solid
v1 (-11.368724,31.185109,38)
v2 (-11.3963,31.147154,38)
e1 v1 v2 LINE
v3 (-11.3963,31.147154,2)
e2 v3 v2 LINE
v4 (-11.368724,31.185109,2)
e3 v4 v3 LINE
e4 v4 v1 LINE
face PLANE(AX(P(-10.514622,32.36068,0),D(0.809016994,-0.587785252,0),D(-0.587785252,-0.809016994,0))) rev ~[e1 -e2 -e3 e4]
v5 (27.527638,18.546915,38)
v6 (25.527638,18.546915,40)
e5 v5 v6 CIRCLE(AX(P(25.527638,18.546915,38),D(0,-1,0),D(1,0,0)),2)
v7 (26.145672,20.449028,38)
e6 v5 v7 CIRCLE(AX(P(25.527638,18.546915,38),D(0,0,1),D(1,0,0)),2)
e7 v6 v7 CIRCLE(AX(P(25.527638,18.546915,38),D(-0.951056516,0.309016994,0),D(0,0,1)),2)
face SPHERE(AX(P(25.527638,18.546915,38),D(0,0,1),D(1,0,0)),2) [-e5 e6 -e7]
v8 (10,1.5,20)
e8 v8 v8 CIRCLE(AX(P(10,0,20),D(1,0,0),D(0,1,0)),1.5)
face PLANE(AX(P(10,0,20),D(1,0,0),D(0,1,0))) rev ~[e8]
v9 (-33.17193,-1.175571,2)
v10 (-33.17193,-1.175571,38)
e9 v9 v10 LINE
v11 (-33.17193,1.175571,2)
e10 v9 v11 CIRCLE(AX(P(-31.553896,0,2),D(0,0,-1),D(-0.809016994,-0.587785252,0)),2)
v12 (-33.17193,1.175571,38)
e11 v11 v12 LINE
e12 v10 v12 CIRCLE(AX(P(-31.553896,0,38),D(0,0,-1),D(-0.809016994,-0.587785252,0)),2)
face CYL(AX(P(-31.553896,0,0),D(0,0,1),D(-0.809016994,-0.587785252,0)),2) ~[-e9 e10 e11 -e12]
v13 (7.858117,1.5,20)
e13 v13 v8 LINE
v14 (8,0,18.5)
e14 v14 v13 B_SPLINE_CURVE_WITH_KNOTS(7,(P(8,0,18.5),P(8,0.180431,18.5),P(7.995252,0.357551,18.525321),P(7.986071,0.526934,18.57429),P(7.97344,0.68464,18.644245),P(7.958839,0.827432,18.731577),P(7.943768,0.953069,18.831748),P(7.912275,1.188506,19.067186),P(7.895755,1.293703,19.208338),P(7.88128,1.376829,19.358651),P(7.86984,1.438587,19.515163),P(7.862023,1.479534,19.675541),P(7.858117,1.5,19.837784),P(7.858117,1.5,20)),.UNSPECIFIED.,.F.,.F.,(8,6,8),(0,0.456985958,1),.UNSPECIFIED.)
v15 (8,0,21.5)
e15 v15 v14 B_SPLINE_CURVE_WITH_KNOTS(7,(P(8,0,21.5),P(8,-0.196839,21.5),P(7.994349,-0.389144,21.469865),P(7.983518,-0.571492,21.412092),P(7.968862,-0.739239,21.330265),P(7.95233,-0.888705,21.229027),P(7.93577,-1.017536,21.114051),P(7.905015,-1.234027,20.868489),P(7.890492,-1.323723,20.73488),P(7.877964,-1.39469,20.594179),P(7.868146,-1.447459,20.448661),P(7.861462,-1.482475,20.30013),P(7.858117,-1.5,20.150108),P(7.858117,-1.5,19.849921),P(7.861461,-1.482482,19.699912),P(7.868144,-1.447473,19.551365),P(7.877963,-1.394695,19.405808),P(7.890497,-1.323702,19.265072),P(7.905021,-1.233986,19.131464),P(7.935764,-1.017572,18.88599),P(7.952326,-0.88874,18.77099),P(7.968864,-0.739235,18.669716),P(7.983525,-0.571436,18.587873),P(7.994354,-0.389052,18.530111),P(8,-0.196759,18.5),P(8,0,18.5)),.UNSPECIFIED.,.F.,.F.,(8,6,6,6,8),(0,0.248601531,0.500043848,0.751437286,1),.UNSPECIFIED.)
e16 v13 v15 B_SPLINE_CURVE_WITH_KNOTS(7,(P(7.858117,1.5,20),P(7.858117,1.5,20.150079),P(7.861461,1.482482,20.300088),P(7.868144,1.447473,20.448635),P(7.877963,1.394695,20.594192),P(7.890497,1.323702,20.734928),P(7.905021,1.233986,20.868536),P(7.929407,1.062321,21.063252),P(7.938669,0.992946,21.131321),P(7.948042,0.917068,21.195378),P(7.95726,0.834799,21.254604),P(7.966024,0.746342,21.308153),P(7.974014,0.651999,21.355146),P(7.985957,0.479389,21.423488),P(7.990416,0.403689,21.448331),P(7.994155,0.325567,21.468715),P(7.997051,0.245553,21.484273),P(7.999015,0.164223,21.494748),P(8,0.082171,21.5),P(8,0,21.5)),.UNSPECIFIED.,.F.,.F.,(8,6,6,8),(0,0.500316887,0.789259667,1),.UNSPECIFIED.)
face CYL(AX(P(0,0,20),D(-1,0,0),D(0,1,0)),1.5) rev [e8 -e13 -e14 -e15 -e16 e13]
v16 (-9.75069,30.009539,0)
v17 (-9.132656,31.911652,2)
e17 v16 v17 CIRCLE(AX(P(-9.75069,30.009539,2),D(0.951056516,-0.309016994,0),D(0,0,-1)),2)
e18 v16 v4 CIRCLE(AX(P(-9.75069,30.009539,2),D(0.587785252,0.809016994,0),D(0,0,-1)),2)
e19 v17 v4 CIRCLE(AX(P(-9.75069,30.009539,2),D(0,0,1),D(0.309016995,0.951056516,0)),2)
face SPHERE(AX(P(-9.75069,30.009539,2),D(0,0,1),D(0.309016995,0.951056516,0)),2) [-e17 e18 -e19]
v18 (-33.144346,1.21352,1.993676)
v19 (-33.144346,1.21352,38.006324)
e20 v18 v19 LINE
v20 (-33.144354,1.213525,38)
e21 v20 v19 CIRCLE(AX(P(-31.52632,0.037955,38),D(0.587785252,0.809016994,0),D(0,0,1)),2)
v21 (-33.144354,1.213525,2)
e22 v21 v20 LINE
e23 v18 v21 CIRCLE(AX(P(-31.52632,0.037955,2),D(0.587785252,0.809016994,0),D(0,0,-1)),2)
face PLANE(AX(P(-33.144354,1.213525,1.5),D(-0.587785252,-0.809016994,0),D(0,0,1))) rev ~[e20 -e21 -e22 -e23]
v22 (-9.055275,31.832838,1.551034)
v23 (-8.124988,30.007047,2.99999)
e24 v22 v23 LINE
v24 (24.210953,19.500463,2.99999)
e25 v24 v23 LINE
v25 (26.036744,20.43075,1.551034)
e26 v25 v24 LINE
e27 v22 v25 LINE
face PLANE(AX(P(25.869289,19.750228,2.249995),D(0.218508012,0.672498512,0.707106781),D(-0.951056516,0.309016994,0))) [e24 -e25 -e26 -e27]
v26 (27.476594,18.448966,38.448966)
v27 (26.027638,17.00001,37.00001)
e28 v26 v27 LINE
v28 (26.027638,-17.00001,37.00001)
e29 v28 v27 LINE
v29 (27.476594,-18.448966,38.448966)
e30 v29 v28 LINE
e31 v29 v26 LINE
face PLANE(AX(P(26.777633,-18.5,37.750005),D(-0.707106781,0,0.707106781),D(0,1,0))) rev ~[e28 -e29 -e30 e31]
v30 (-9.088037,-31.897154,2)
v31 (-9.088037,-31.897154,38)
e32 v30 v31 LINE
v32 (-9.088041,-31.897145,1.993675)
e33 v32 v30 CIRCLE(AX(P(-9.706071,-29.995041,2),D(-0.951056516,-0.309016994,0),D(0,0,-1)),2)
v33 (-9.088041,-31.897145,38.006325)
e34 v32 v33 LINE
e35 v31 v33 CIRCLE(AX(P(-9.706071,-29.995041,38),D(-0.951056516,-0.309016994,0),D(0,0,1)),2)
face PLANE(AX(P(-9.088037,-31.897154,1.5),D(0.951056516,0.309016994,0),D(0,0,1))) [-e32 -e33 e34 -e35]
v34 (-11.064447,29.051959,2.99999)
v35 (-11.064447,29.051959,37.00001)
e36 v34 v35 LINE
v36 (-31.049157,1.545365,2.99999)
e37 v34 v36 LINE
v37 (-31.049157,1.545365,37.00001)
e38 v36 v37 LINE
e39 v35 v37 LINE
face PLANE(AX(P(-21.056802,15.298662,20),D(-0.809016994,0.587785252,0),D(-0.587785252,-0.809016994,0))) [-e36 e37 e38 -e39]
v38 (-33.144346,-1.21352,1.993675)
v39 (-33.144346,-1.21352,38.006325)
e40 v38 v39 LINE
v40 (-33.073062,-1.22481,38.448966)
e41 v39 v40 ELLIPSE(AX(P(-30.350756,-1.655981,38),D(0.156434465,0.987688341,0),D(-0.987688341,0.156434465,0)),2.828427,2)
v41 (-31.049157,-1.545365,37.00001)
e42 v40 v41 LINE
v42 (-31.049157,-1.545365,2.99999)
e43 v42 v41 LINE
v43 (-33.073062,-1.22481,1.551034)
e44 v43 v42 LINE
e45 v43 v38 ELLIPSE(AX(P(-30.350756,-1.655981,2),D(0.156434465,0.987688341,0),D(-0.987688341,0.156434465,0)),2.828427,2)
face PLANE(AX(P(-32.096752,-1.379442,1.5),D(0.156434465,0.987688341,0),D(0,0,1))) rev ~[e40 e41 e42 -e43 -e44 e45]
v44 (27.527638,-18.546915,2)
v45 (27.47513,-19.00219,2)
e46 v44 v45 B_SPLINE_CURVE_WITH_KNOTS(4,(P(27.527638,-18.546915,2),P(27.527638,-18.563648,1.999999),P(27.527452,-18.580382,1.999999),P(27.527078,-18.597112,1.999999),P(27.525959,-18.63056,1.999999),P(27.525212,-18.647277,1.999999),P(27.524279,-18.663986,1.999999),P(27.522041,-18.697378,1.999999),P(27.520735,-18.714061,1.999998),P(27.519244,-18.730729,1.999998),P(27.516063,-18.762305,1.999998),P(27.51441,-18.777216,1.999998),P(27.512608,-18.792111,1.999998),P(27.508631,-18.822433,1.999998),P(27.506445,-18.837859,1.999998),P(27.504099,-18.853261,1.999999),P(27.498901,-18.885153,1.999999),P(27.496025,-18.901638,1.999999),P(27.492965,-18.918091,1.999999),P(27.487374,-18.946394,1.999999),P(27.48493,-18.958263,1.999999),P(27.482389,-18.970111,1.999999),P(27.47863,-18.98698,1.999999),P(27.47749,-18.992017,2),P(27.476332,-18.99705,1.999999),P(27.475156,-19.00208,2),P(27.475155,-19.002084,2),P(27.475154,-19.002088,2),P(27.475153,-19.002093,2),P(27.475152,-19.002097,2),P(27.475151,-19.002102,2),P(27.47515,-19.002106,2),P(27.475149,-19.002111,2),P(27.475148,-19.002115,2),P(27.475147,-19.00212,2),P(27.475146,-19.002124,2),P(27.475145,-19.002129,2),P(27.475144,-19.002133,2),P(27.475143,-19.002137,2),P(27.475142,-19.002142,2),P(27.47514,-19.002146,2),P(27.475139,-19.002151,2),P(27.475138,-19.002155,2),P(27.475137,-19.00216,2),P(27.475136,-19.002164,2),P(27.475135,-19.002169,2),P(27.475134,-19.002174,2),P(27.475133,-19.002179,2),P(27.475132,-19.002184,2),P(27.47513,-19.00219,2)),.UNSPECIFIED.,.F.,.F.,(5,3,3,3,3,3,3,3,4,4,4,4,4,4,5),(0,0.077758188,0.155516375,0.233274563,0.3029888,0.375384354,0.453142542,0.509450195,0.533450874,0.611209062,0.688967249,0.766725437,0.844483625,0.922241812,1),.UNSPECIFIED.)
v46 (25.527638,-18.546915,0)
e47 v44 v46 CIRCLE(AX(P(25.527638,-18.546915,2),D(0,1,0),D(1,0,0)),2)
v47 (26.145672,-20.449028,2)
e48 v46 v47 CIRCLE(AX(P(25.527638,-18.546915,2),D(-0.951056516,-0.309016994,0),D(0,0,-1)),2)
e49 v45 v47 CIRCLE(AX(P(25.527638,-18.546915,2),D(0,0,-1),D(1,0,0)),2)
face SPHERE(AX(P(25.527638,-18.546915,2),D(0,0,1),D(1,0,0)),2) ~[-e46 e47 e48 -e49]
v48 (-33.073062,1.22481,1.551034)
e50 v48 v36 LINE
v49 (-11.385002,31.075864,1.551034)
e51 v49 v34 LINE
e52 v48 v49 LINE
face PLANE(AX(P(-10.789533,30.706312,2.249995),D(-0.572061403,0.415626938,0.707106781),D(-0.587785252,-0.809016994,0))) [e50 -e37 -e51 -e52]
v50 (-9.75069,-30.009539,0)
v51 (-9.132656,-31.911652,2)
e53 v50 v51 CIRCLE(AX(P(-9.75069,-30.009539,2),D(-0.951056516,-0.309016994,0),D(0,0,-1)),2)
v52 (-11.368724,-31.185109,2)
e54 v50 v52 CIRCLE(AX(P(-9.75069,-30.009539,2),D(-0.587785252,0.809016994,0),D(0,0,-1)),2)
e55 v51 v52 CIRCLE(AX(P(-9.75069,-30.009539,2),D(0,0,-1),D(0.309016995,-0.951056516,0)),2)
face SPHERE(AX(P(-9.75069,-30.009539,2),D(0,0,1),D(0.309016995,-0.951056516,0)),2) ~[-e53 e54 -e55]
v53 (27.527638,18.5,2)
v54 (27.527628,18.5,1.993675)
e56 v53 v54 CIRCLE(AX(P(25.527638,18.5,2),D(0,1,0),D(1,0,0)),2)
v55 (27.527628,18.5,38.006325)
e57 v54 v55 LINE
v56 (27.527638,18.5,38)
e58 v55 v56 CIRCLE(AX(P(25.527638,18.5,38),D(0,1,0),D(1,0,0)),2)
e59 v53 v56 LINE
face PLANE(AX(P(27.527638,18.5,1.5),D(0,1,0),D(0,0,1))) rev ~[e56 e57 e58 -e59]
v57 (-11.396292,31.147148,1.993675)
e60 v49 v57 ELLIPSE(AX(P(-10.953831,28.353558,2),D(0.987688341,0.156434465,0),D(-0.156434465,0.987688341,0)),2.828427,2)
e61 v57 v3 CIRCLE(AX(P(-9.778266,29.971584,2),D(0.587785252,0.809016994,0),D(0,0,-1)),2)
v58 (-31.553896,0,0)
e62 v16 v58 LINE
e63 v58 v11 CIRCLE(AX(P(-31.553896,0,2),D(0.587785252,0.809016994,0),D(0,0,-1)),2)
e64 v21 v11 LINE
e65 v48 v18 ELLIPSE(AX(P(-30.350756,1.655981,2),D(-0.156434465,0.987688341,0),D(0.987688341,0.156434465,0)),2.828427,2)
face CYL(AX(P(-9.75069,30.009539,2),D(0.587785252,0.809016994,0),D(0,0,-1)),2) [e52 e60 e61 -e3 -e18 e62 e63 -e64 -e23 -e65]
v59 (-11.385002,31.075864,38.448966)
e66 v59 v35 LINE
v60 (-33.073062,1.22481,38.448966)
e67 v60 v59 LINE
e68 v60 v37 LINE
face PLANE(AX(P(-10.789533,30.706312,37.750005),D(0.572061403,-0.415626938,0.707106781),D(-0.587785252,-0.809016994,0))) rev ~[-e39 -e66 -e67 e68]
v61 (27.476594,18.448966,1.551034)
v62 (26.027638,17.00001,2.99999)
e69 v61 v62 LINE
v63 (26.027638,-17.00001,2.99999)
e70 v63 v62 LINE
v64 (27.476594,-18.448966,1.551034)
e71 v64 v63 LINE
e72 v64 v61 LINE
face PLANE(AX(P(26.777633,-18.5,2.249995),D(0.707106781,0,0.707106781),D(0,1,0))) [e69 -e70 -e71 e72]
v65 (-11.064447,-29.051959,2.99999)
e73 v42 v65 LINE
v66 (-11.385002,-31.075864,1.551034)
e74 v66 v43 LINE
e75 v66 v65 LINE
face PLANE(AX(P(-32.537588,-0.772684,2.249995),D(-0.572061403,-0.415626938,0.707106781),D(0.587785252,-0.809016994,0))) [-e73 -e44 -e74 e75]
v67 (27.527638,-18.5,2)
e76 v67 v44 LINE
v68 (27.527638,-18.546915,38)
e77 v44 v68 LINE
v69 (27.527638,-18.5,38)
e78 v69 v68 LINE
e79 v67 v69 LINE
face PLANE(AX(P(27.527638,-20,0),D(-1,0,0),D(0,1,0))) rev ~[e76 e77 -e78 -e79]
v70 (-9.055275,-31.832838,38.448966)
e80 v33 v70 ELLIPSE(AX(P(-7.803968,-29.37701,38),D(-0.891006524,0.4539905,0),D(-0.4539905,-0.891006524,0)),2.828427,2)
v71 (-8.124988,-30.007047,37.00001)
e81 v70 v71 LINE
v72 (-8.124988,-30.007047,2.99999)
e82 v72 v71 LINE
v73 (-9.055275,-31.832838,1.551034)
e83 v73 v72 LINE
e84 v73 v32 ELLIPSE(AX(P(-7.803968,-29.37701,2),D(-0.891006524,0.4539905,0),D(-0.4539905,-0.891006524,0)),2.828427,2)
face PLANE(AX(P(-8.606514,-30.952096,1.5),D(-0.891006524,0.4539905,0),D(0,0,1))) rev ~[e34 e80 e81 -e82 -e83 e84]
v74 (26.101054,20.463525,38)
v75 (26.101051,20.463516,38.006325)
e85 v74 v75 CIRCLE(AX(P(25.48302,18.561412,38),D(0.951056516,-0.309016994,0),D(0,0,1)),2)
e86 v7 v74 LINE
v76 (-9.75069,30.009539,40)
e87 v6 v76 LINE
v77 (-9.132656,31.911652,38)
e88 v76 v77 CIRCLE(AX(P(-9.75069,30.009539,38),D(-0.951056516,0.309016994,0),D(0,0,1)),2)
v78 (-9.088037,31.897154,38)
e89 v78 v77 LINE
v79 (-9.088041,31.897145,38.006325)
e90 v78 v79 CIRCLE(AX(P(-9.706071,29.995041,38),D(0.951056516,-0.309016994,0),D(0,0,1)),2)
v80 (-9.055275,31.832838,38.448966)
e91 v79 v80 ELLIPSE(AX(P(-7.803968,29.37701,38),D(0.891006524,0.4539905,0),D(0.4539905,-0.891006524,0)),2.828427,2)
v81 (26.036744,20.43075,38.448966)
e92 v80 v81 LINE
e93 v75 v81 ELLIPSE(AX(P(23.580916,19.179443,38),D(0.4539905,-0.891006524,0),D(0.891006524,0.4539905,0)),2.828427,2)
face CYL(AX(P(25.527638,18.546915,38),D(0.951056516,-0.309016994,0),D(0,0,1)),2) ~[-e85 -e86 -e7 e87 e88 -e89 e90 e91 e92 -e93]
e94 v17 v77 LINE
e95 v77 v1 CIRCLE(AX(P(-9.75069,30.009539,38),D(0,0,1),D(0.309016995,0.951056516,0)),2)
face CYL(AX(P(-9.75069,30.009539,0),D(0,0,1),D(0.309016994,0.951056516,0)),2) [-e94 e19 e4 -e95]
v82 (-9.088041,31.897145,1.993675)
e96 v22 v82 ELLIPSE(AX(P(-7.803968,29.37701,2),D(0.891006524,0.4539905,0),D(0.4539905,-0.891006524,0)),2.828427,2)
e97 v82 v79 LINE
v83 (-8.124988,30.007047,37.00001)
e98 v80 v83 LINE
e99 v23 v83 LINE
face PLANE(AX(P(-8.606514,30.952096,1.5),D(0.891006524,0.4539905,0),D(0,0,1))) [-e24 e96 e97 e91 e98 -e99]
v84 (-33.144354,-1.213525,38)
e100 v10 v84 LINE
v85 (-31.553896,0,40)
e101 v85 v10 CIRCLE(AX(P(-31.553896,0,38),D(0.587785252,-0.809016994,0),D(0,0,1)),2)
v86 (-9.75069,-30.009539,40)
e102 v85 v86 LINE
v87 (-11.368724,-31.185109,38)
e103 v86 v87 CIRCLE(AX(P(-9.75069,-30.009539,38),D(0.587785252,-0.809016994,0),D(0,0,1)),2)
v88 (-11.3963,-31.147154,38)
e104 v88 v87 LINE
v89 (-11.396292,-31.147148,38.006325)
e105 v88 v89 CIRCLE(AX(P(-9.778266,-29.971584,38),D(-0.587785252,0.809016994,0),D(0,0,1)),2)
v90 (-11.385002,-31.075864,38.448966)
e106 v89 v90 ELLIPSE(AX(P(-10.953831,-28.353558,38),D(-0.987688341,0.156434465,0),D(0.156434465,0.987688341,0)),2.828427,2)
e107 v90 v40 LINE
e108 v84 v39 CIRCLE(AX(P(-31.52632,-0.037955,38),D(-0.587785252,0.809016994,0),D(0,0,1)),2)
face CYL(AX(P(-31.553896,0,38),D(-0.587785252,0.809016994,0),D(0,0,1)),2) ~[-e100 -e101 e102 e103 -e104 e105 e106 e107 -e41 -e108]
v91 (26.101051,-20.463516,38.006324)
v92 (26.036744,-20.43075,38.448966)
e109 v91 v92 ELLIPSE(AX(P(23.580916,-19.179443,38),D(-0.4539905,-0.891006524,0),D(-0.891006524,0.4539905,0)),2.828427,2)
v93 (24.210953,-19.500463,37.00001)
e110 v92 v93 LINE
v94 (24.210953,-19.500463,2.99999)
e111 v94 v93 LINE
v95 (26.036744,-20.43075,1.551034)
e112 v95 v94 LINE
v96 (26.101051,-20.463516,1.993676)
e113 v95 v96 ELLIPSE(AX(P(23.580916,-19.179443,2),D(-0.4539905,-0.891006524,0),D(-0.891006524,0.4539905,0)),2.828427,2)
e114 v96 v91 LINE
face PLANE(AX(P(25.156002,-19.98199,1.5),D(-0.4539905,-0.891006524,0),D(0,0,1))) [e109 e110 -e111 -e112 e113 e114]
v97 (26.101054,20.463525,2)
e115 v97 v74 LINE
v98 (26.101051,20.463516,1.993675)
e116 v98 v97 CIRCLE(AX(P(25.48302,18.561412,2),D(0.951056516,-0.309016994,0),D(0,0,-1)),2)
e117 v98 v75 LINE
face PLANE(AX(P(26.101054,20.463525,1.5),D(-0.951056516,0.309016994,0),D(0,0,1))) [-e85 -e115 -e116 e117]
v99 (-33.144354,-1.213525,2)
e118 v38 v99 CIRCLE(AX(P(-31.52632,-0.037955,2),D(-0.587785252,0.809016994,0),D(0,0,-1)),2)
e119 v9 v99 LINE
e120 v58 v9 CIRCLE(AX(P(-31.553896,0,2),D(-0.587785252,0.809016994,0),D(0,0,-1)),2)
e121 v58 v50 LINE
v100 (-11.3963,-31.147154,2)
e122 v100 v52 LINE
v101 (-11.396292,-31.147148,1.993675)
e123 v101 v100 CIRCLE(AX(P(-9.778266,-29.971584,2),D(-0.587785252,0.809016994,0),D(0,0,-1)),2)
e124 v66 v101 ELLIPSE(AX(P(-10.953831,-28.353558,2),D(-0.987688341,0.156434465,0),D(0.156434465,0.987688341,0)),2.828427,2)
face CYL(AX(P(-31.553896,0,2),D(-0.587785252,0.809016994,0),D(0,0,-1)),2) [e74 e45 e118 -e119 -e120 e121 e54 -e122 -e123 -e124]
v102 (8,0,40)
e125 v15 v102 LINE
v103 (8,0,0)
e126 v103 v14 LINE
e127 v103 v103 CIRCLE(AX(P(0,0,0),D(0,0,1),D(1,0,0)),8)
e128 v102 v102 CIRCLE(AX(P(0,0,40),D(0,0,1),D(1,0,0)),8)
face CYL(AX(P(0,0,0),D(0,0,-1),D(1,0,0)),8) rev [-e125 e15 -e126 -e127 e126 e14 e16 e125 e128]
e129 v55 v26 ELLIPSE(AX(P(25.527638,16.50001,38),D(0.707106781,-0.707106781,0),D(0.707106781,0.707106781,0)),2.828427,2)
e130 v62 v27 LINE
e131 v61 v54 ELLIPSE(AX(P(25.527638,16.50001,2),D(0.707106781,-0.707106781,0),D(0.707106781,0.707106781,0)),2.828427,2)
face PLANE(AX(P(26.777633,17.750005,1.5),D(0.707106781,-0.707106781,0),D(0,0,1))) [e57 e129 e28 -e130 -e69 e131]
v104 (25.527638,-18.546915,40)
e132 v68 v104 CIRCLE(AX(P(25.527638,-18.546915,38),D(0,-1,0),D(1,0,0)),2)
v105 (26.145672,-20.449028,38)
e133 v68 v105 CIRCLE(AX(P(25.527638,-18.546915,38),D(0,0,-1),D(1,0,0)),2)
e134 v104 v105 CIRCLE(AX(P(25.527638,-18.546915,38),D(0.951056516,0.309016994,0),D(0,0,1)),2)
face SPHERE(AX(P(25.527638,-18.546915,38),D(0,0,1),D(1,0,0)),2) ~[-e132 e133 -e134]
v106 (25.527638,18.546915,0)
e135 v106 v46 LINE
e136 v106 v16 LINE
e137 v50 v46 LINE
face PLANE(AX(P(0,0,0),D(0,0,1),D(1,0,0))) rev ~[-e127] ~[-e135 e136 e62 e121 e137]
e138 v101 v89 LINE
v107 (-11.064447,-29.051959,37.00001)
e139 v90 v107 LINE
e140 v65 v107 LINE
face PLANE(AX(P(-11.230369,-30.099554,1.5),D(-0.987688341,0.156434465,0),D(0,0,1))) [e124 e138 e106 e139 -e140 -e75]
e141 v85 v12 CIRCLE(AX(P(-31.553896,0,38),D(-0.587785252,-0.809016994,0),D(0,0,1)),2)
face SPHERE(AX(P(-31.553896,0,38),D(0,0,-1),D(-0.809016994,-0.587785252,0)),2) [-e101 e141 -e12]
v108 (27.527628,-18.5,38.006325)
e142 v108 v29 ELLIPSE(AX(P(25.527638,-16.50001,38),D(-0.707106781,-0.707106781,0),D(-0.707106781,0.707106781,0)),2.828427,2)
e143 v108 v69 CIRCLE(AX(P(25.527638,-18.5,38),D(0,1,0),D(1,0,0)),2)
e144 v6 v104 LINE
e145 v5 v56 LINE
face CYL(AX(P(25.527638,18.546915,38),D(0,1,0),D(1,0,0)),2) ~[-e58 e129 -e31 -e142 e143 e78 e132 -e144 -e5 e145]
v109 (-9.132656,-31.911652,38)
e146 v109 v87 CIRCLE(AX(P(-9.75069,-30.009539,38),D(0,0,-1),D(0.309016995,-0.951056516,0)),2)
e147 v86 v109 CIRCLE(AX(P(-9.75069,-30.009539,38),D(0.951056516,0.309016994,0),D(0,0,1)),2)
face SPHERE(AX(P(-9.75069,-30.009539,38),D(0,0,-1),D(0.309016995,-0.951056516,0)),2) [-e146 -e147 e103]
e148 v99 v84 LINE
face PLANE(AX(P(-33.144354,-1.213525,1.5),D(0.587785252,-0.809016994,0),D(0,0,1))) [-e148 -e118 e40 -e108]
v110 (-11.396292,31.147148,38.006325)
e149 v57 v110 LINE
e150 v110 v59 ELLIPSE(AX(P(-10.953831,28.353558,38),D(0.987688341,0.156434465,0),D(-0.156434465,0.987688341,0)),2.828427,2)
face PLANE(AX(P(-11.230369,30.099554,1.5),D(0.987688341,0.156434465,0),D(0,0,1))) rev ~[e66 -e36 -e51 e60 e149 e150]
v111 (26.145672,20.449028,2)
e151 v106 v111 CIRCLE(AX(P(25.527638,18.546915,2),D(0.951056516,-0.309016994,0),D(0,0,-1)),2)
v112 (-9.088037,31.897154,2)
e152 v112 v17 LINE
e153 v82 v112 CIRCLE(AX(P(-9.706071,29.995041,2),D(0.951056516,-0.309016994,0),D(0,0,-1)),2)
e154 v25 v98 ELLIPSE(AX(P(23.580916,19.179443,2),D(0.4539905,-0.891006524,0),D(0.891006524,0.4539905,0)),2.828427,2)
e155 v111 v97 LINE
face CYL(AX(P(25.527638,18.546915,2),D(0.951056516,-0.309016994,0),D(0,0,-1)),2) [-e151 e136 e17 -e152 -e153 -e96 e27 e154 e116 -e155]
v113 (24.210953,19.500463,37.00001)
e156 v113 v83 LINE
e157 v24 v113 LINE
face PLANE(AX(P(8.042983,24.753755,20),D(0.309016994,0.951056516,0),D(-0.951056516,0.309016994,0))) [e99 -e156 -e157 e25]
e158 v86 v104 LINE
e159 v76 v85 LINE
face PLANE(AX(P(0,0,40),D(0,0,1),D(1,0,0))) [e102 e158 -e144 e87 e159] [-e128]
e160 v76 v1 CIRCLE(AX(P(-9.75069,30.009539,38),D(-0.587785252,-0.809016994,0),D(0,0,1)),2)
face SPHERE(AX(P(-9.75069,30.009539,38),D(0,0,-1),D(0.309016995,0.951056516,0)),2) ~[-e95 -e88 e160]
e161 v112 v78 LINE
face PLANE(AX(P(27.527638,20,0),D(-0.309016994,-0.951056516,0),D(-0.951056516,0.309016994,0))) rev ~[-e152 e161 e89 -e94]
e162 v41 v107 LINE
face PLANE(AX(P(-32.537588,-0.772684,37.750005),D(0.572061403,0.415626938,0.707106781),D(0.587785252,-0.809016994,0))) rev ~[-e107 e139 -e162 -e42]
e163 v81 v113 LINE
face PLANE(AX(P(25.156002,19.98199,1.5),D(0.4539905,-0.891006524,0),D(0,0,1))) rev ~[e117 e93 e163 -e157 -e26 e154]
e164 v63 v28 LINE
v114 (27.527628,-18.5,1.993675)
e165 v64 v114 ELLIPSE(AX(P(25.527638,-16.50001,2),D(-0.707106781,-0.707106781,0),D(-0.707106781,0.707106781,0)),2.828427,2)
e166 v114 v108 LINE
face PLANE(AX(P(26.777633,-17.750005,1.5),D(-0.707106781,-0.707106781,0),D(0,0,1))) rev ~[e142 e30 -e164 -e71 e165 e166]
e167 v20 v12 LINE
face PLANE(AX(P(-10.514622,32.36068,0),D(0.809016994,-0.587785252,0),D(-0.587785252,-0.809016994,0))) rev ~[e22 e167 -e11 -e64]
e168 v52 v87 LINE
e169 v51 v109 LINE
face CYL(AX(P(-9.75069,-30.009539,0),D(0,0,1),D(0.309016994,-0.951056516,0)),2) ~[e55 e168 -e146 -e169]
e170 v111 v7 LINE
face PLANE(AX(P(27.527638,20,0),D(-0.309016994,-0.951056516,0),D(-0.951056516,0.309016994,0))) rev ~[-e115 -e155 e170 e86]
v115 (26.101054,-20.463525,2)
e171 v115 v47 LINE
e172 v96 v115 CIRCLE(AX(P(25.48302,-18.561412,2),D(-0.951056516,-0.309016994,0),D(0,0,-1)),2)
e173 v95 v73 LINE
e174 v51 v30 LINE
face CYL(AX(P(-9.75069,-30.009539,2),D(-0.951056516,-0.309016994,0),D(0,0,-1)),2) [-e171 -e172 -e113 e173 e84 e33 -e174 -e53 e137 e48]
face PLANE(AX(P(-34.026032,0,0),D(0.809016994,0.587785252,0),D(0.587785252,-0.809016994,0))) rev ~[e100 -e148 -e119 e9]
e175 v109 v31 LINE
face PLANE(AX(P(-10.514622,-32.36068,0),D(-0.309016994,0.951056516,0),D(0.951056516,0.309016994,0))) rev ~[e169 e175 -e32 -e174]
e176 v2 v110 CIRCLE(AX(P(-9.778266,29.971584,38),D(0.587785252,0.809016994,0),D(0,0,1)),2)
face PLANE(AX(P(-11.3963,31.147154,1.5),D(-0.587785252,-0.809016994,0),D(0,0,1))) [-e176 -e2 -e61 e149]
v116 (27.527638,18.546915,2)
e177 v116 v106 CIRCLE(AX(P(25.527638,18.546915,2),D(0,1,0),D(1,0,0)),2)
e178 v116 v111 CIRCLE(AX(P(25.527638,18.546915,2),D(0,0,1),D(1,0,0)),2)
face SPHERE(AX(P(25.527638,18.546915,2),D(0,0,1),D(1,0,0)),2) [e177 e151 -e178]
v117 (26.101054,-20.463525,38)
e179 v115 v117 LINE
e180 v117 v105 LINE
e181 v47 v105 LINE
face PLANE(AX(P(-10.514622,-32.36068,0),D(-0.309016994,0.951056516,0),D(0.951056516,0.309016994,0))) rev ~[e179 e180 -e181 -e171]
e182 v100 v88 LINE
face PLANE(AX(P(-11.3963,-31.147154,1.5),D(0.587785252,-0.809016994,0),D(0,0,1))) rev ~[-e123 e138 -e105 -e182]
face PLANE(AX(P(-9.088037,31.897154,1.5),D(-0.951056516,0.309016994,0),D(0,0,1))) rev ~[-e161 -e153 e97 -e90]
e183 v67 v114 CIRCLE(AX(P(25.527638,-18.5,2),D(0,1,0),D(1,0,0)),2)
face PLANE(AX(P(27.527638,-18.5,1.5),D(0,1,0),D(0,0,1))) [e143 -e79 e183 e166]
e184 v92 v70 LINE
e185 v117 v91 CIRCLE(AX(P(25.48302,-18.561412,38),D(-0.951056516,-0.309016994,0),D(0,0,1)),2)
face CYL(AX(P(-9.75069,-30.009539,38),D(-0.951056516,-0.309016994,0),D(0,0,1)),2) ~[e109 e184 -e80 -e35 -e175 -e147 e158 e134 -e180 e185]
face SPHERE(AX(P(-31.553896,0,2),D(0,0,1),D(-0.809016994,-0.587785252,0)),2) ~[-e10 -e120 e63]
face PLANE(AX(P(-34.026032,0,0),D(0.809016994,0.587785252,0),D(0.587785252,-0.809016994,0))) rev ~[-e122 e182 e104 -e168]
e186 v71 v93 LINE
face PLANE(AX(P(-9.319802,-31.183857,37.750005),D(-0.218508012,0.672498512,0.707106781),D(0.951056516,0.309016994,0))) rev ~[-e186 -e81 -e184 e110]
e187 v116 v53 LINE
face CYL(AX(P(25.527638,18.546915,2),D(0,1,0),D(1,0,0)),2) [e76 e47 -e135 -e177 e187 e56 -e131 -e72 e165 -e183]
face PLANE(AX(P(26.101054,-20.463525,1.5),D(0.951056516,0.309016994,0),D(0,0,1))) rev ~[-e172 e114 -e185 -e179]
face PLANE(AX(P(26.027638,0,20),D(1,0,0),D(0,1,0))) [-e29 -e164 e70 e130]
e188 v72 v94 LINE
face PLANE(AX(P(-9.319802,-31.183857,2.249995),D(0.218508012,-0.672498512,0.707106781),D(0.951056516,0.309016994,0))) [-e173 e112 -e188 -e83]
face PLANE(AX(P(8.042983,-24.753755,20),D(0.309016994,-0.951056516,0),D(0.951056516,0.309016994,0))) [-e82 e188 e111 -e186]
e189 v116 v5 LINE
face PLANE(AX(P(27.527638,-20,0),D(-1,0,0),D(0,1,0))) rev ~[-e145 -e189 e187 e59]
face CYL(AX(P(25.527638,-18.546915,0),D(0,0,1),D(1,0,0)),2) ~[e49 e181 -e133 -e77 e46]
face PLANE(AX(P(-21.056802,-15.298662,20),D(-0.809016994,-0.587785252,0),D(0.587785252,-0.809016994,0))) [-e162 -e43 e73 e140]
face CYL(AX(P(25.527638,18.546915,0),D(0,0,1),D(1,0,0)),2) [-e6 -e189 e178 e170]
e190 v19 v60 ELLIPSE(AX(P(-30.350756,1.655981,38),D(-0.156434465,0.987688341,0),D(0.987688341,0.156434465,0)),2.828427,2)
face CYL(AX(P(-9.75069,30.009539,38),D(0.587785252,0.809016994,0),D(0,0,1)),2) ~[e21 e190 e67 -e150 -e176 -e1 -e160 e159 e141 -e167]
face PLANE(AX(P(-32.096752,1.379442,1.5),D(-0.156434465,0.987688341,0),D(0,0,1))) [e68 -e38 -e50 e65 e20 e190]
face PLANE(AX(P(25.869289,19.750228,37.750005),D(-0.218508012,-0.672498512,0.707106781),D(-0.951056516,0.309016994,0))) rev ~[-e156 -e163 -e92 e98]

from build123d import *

# Parameters (mm, degrees)
F0_R            = 8
F1_DEPTH        = 40
F2_W            = 37
F2_H            = 37
F3_DEPTH        = 1.5
F3_COPIES_COUNT = 5
F4_SIZE         = 1.49999
F5_R            = 3
F6_DEPTH        = 20
F7_R            = 2
F8_T1_DEPTH     = 37.093829888
F8_T3_DEPTH     = 37.093829888
F8_T5_DEPTH     = 37.093829888
F8_T7_DEPTH     = 37.093829888
F8_T9_DEPTH     = 37.093829888
F8_T12_ANGLE    = 72
F8_T14_ANGLE    = 72
F8_T16_ANGLE    = 72
F8_T18_ANGLE    = 72
F8_T20_ANGLE    = 72
F8_T22_ANGLE    = 72
F8_T24_ANGLE    = 72
F8_T26_ANGLE    = 72
F8_T28_ANGLE    = 72
F8_T30_ANGLE    = 72
F9_R            = 1.5
F10_DEPTH       = 10


# Not quite as in the source:
# - a fillet or chamfer that OpenCascade refuses, or shapes differently, is made with other operations: its cross-section is extruded or revolved along the edge and cut away or added
# - a fillet or chamfer is up to 0.001 mm smaller than in the source, because OpenCascade refuses the exact size
# - a pattern or mirror of a feature is missing from the dataset's text; its kind, count and spacing are read off the source's solid


with BuildPart() as f1:
    # F0 (on Top) → F1 (new body)
    with BuildSketch(Plane.XY):
        Polygon((27.5276384094, -20), (27.5276384094, 20), (-10.5146222424, 32.360679775), (-34.0260323341, 0), (-10.5146222424, -32.360679775), align=None)
        Circle(F0_R, mode=Mode.SUBTRACT)
    extrude(amount=F1_DEPTH)

    # F2 (on face) → F3 (cut)
    with BuildSketch(Plane.YZ.offset(27.5276384094)):
        with Locations((0, 20)):
            Rectangle(F2_W, F2_H)
    f3 = extrude(amount=-F3_DEPTH, mode=Mode.SUBTRACT)

    # F3_copies: F3 ×5 about axis
    f3_copies_axis = Axis((0, 0, 0), (0, 0, 1))
    for i in range(1, F3_COPIES_COUNT):
        add(f3.rotate(f3_copies_axis, i * 360 / F3_COPIES_COUNT), mode=Mode.SUBTRACT)

    # F4 (size 1.5 in the source; OpenCascade refuses exactly that, so slightly less here)
    f4_edges = [f1.edges().sort_by_distance(p)[0] for p in [
        (26.027638, 0, 38.5),
        (26.027638, -18.5, 20),
        (26.027638, 0, 1.5),
        (26.027638, 18.5, 20),
        (25.637528, -19.036941, 20),
        (8.042983, -24.753755, 1.5),
        (-9.551563, -30.47057, 20),
        (8.042983, -24.753755, 38.5),
        (-9.551563, 30.47057, 20),
        (8.042983, 24.753755, 1.5),
        (25.637528, 19.036941, 20),
        (8.042983, 24.753755, 38.5),
        (-10.182775, -30.265476, 20),
        (-21.056802, -15.298662, 1.5),
        (-31.930829, -0.331848, 20),
        (-21.056802, -15.298662, 38.5),
        (-31.930829, 0.331848, 20),
        (-21.056802, 15.298662, 1.5),
        (-10.182775, 30.265476, 20),
        (-21.056802, 15.298662, 38.5),
    ]]
    chamfer(f4_edges, length=F4_SIZE)

    # F5 (on Right) → F6 (cut)
    with BuildSketch(Plane.YZ):
        with Locations((0, 49.5)):
            Circle(F5_R)
    extrude(amount=F6_DEPTH, mode=Mode.SUBTRACT)

    # F7
    f7_edges = [f1.edges().sort_by_distance(p)[0] for p in [
        (-34.026032, 0, 20),
        (-10.514622, -32.36068, 20),
        (27.527638, -20, 20),
        (27.527638, 20, 20),
        (-10.514622, 32.36068, 20),
    ]]
    fillet(f7_edges, radius=F7_R)

    # F8: fillet of radius 2 on 12 edges, made by hand

    # F8_s2 → F8_t1 (cut)
    with BuildSketch(Plane(origin=(-17.6391643147, -5.7313119109, 0), x_dir=(0, 0, 1), z_dir=(0.9510565163, 0.3090169944, 0))):
        with BuildLine():
            ThreePointArc((40, 25.5276384094), (39.4142135624, 26.9418519718), (38, 27.5276384094))
            Line((38, 27.5276384094), (40, 27.5276384094))
            Line((40, 27.5276384094), (40, 25.5276384094))
        make_face()
        with BuildLine():
            ThreePointArc((0, 25.5276384094), (0.5857864376, 26.9418519718), (2, 27.5276384094))
            Line((2, 27.5276384094), (0, 27.5276384094))
            Line((0, 27.5276384094), (0, 25.5276384094))
        make_face()
    extrude(amount=F8_T1_DEPTH, mode=Mode.SUBTRACT)

    # F8_s4 → F8_t3 (cut)
    with BuildSketch(Plane(origin=(-10.9016030796, 15.0047693829, 0), x_dir=(0, 0, 1), z_dir=(0.5877852523, -0.8090169944, 0))):
        with BuildLine():
            ThreePointArc((40, 25.5276384094), (39.4142135624, 26.9418519718), (38, 27.5276384094))
            Line((38, 27.5276384094), (40, 27.5276384094))
            Line((40, 27.5276384094), (40, 25.5276384094))
        make_face()
        with BuildLine():
            ThreePointArc((0, 25.5276384094), (0.5857864376, 26.9418519718), (2, 27.5276384094))
            Line((2, 27.5276384094), (0, 27.5276384094))
            Line((0, 27.5276384094), (0, 25.5276384094))
        make_face()
    extrude(amount=F8_T3_DEPTH, mode=Mode.SUBTRACT)

    # F8_s6 → F8_t5 (cut)
    with BuildSketch(Plane(origin=(10.9016030796, 15.0047693829, 0), x_dir=(0, 0, 1), z_dir=(-0.5877852523, -0.8090169944, 0))):
        with BuildLine():
            ThreePointArc((40, 25.5276384094), (39.4142135624, 26.9418519718), (38, 27.5276384094))
            Line((38, 27.5276384094), (40, 27.5276384094))
            Line((40, 27.5276384094), (40, 25.5276384094))
        make_face()
        with BuildLine():
            ThreePointArc((0, 25.5276384094), (0.5857864376, 26.9418519718), (2, 27.5276384094))
            Line((2, 27.5276384094), (0, 27.5276384094))
            Line((0, 27.5276384094), (0, 25.5276384094))
        make_face()
    extrude(amount=F8_T5_DEPTH, mode=Mode.SUBTRACT)

    # F8_s8 → F8_t7 (cut)
    with BuildSketch(Plane(origin=(17.6391643147, -5.7313119109, 0), x_dir=(0, 0, 1), z_dir=(-0.9510565163, 0.3090169944, 0))):
        with BuildLine():
            ThreePointArc((40, 25.5276384094), (39.4142135624, 26.9418519718), (38, 27.5276384094))
            Line((38, 27.5276384094), (40, 27.5276384094))
            Line((40, 27.5276384094), (40, 25.5276384094))
        make_face()
        with BuildLine():
            ThreePointArc((0, 25.5276384094), (0.5857864376, 26.9418519718), (2, 27.5276384094))
            Line((2, 27.5276384094), (0, 27.5276384094))
            Line((0, 27.5276384094), (0, 25.5276384094))
        make_face()
    extrude(amount=F8_T7_DEPTH, mode=Mode.SUBTRACT)

    # F8_s10 → F8_t9 (cut)
    with BuildSketch(Plane.XZ.offset(-18.546914944)):
        with BuildLine():
            ThreePointArc((27.5276384094, 38), (26.9418519718, 39.4142135624), (25.5276384094, 40))
            Line((25.5276384094, 40), (27.5276384094, 40))
            Line((27.5276384094, 40), (27.5276384094, 38))
        make_face()
        with BuildLine():
            ThreePointArc((27.5276384094, 2), (26.9418519718, 0.5857864376), (25.5276384094, 0))
            Line((25.5276384094, 0), (27.5276384094, 0))
            Line((27.5276384094, 0), (27.5276384094, 2))
        make_face()
    extrude(amount=F8_T9_DEPTH, mode=Mode.SUBTRACT)

    # F8_s11 → F8_t12 (revolve, cut)
    with BuildSketch(Plane.XZ.offset(18.546914944)):
        with BuildLine():
            ThreePointArc((25.5276384094, 0), (26.9418519718, 0.5857864376), (27.5276384094, 2))
            Line((27.5276384094, 2), (27.5276384094, 0))
            Line((27.5276384094, 0), (25.5276384094, 0))
        make_face()
    revolve(axis=Axis((25.5276384094, -18.546914944, 0), (0, 0, -1)), revolution_arc=F8_T12_ANGLE, mode=Mode.SUBTRACT)

    # F8_s13 → F8_t14 (revolve, cut)
    with BuildSketch(Plane.XZ.offset(-18.546914944)):
        with BuildLine():
            ThreePointArc((25.5276384094, 0), (26.9418519718, 0.5857864376), (27.5276384094, 2))
            Line((27.5276384094, 2), (27.5276384094, 0))
            Line((27.5276384094, 0), (25.5276384094, 0))
        make_face()
    revolve(axis=Axis((25.5276384094, 18.546914944, 0), (0, 0, 1)), revolution_arc=F8_T14_ANGLE, mode=Mode.SUBTRACT)

    # F8_s15 → F8_t16 (revolve, cut)
    with BuildSketch(Plane(origin=(-17.6391643147, -5.7313119109, 0), x_dir=(0, 0, 1), z_dir=(0.9510565163, 0.3090169944, 0))):
        with BuildLine():
            ThreePointArc((0, 25.5276384094), (0.5857864376, 26.9418519718), (2, 27.5276384094))
            Line((2, 27.5276384094), (0, 27.5276384094))
            Line((0, 27.5276384094), (0, 25.5276384094))
        make_face()
    revolve(axis=Axis((-9.7506902199, -30.0095387658, 0), (0, 0, -1)), revolution_arc=F8_T16_ANGLE, mode=Mode.SUBTRACT)

    # F8_s17 → F8_t18 (revolve, cut)
    with BuildSketch(Plane(origin=(-17.6391643147, 5.7313119109, 0), x_dir=(0, 0, 1), z_dir=(0.9510565163, -0.3090169944, 0))):
        with BuildLine():
            ThreePointArc((0, -25.5276384094), (0.5857864376, -26.9418519718), (2, -27.5276384094))
            Line((2, -27.5276384094), (0, -27.5276384094))
            Line((0, -27.5276384094), (0, -25.5276384094))
        make_face()
    revolve(axis=Axis((-9.7506902199, 30.0095387658, 0), (0, 0, 1)), revolution_arc=F8_T18_ANGLE, mode=Mode.SUBTRACT)

    # F8_s19 → F8_t20 (revolve, cut)
    with BuildSketch(Plane(origin=(-10.9016030796, 15.0047693829, 0), x_dir=(0, 0, 1), z_dir=(0.5877852523, -0.8090169944, 0))):
        with BuildLine():
            ThreePointArc((0, 25.5276384094), (0.5857864376, 26.9418519718), (2, 27.5276384094))
            Line((2, 27.5276384094), (0, 27.5276384094))
            Line((0, 27.5276384094), (0, 25.5276384094))
        make_face()
    revolve(axis=Axis((-31.5538963791, 0, 0), (0, 0, -1)), revolution_arc=F8_T20_ANGLE, mode=Mode.SUBTRACT)

    # F8_s21 → F8_t22 (revolve, cut)
    with BuildSketch(Plane.XZ.offset(18.546914944)):
        with BuildLine():
            ThreePointArc((27.5276384094, 38), (26.9418519718, 39.4142135624), (25.5276384094, 40))
            Line((25.5276384094, 40), (27.5276384094, 40))
            Line((27.5276384094, 40), (27.5276384094, 38))
        make_face()
    revolve(axis=Axis((25.5276384094, -18.546914944, 40), (0, 0, -1)), revolution_arc=F8_T22_ANGLE, mode=Mode.SUBTRACT)

    # F8_s23 → F8_t24 (revolve, cut)
    with BuildSketch(Plane.XZ.offset(-18.546914944)):
        with BuildLine():
            ThreePointArc((27.5276384094, 38), (26.9418519718, 39.4142135624), (25.5276384094, 40))
            Line((25.5276384094, 40), (27.5276384094, 40))
            Line((27.5276384094, 40), (27.5276384094, 38))
        make_face()
    revolve(axis=Axis((25.5276384094, 18.546914944, 40), (0, 0, 1)), revolution_arc=F8_T24_ANGLE, mode=Mode.SUBTRACT)

    # F8_s25 → F8_t26 (revolve, cut)
    with BuildSketch(Plane(origin=(-17.6391643147, -5.7313119109, 0), x_dir=(0, 0, 1), z_dir=(0.9510565163, 0.3090169944, 0))):
        with BuildLine():
            ThreePointArc((40, 25.5276384094), (39.4142135624, 26.9418519718), (38, 27.5276384094))
            Line((38, 27.5276384094), (40, 27.5276384094))
            Line((40, 27.5276384094), (40, 25.5276384094))
        make_face()
    revolve(axis=Axis((-9.7506902199, -30.0095387658, 40), (0, 0, -1)), revolution_arc=F8_T26_ANGLE, mode=Mode.SUBTRACT)

    # F8_s27 → F8_t28 (revolve, cut)
    with BuildSketch(Plane(origin=(-17.6391643147, 5.7313119109, 0), x_dir=(0, 0, 1), z_dir=(0.9510565163, -0.3090169944, 0))):
        with BuildLine():
            ThreePointArc((40, -25.5276384094), (39.4142135624, -26.9418519718), (38, -27.5276384094))
            Line((38, -27.5276384094), (40, -27.5276384094))
            Line((40, -27.5276384094), (40, -25.5276384094))
        make_face()
    revolve(axis=Axis((-9.7506902199, 30.0095387658, 40), (0, 0, 1)), revolution_arc=F8_T28_ANGLE, mode=Mode.SUBTRACT)

    # F8_s29 → F8_t30 (revolve, cut)
    with BuildSketch(Plane(origin=(-10.9016030796, 15.0047693829, 0), x_dir=(0, 0, 1), z_dir=(0.5877852523, -0.8090169944, 0))):
        with BuildLine():
            ThreePointArc((40, 25.5276384094), (39.4142135624, 26.9418519718), (38, 27.5276384094))
            Line((38, 27.5276384094), (40, 27.5276384094))
            Line((40, 27.5276384094), (40, 25.5276384094))
        make_face()
    revolve(axis=Axis((-31.5538963791, 0, 40), (0, 0, -1)), revolution_arc=F8_T30_ANGLE, mode=Mode.SUBTRACT)

    # F9 (on Right) → F10 (cut)
    with BuildSketch(Plane.YZ):
        with Locations((0, 20)):
            Circle(F9_R)
    extrude(amount=F10_DEPTH, mode=Mode.SUBTRACT)


solid = f1.part
